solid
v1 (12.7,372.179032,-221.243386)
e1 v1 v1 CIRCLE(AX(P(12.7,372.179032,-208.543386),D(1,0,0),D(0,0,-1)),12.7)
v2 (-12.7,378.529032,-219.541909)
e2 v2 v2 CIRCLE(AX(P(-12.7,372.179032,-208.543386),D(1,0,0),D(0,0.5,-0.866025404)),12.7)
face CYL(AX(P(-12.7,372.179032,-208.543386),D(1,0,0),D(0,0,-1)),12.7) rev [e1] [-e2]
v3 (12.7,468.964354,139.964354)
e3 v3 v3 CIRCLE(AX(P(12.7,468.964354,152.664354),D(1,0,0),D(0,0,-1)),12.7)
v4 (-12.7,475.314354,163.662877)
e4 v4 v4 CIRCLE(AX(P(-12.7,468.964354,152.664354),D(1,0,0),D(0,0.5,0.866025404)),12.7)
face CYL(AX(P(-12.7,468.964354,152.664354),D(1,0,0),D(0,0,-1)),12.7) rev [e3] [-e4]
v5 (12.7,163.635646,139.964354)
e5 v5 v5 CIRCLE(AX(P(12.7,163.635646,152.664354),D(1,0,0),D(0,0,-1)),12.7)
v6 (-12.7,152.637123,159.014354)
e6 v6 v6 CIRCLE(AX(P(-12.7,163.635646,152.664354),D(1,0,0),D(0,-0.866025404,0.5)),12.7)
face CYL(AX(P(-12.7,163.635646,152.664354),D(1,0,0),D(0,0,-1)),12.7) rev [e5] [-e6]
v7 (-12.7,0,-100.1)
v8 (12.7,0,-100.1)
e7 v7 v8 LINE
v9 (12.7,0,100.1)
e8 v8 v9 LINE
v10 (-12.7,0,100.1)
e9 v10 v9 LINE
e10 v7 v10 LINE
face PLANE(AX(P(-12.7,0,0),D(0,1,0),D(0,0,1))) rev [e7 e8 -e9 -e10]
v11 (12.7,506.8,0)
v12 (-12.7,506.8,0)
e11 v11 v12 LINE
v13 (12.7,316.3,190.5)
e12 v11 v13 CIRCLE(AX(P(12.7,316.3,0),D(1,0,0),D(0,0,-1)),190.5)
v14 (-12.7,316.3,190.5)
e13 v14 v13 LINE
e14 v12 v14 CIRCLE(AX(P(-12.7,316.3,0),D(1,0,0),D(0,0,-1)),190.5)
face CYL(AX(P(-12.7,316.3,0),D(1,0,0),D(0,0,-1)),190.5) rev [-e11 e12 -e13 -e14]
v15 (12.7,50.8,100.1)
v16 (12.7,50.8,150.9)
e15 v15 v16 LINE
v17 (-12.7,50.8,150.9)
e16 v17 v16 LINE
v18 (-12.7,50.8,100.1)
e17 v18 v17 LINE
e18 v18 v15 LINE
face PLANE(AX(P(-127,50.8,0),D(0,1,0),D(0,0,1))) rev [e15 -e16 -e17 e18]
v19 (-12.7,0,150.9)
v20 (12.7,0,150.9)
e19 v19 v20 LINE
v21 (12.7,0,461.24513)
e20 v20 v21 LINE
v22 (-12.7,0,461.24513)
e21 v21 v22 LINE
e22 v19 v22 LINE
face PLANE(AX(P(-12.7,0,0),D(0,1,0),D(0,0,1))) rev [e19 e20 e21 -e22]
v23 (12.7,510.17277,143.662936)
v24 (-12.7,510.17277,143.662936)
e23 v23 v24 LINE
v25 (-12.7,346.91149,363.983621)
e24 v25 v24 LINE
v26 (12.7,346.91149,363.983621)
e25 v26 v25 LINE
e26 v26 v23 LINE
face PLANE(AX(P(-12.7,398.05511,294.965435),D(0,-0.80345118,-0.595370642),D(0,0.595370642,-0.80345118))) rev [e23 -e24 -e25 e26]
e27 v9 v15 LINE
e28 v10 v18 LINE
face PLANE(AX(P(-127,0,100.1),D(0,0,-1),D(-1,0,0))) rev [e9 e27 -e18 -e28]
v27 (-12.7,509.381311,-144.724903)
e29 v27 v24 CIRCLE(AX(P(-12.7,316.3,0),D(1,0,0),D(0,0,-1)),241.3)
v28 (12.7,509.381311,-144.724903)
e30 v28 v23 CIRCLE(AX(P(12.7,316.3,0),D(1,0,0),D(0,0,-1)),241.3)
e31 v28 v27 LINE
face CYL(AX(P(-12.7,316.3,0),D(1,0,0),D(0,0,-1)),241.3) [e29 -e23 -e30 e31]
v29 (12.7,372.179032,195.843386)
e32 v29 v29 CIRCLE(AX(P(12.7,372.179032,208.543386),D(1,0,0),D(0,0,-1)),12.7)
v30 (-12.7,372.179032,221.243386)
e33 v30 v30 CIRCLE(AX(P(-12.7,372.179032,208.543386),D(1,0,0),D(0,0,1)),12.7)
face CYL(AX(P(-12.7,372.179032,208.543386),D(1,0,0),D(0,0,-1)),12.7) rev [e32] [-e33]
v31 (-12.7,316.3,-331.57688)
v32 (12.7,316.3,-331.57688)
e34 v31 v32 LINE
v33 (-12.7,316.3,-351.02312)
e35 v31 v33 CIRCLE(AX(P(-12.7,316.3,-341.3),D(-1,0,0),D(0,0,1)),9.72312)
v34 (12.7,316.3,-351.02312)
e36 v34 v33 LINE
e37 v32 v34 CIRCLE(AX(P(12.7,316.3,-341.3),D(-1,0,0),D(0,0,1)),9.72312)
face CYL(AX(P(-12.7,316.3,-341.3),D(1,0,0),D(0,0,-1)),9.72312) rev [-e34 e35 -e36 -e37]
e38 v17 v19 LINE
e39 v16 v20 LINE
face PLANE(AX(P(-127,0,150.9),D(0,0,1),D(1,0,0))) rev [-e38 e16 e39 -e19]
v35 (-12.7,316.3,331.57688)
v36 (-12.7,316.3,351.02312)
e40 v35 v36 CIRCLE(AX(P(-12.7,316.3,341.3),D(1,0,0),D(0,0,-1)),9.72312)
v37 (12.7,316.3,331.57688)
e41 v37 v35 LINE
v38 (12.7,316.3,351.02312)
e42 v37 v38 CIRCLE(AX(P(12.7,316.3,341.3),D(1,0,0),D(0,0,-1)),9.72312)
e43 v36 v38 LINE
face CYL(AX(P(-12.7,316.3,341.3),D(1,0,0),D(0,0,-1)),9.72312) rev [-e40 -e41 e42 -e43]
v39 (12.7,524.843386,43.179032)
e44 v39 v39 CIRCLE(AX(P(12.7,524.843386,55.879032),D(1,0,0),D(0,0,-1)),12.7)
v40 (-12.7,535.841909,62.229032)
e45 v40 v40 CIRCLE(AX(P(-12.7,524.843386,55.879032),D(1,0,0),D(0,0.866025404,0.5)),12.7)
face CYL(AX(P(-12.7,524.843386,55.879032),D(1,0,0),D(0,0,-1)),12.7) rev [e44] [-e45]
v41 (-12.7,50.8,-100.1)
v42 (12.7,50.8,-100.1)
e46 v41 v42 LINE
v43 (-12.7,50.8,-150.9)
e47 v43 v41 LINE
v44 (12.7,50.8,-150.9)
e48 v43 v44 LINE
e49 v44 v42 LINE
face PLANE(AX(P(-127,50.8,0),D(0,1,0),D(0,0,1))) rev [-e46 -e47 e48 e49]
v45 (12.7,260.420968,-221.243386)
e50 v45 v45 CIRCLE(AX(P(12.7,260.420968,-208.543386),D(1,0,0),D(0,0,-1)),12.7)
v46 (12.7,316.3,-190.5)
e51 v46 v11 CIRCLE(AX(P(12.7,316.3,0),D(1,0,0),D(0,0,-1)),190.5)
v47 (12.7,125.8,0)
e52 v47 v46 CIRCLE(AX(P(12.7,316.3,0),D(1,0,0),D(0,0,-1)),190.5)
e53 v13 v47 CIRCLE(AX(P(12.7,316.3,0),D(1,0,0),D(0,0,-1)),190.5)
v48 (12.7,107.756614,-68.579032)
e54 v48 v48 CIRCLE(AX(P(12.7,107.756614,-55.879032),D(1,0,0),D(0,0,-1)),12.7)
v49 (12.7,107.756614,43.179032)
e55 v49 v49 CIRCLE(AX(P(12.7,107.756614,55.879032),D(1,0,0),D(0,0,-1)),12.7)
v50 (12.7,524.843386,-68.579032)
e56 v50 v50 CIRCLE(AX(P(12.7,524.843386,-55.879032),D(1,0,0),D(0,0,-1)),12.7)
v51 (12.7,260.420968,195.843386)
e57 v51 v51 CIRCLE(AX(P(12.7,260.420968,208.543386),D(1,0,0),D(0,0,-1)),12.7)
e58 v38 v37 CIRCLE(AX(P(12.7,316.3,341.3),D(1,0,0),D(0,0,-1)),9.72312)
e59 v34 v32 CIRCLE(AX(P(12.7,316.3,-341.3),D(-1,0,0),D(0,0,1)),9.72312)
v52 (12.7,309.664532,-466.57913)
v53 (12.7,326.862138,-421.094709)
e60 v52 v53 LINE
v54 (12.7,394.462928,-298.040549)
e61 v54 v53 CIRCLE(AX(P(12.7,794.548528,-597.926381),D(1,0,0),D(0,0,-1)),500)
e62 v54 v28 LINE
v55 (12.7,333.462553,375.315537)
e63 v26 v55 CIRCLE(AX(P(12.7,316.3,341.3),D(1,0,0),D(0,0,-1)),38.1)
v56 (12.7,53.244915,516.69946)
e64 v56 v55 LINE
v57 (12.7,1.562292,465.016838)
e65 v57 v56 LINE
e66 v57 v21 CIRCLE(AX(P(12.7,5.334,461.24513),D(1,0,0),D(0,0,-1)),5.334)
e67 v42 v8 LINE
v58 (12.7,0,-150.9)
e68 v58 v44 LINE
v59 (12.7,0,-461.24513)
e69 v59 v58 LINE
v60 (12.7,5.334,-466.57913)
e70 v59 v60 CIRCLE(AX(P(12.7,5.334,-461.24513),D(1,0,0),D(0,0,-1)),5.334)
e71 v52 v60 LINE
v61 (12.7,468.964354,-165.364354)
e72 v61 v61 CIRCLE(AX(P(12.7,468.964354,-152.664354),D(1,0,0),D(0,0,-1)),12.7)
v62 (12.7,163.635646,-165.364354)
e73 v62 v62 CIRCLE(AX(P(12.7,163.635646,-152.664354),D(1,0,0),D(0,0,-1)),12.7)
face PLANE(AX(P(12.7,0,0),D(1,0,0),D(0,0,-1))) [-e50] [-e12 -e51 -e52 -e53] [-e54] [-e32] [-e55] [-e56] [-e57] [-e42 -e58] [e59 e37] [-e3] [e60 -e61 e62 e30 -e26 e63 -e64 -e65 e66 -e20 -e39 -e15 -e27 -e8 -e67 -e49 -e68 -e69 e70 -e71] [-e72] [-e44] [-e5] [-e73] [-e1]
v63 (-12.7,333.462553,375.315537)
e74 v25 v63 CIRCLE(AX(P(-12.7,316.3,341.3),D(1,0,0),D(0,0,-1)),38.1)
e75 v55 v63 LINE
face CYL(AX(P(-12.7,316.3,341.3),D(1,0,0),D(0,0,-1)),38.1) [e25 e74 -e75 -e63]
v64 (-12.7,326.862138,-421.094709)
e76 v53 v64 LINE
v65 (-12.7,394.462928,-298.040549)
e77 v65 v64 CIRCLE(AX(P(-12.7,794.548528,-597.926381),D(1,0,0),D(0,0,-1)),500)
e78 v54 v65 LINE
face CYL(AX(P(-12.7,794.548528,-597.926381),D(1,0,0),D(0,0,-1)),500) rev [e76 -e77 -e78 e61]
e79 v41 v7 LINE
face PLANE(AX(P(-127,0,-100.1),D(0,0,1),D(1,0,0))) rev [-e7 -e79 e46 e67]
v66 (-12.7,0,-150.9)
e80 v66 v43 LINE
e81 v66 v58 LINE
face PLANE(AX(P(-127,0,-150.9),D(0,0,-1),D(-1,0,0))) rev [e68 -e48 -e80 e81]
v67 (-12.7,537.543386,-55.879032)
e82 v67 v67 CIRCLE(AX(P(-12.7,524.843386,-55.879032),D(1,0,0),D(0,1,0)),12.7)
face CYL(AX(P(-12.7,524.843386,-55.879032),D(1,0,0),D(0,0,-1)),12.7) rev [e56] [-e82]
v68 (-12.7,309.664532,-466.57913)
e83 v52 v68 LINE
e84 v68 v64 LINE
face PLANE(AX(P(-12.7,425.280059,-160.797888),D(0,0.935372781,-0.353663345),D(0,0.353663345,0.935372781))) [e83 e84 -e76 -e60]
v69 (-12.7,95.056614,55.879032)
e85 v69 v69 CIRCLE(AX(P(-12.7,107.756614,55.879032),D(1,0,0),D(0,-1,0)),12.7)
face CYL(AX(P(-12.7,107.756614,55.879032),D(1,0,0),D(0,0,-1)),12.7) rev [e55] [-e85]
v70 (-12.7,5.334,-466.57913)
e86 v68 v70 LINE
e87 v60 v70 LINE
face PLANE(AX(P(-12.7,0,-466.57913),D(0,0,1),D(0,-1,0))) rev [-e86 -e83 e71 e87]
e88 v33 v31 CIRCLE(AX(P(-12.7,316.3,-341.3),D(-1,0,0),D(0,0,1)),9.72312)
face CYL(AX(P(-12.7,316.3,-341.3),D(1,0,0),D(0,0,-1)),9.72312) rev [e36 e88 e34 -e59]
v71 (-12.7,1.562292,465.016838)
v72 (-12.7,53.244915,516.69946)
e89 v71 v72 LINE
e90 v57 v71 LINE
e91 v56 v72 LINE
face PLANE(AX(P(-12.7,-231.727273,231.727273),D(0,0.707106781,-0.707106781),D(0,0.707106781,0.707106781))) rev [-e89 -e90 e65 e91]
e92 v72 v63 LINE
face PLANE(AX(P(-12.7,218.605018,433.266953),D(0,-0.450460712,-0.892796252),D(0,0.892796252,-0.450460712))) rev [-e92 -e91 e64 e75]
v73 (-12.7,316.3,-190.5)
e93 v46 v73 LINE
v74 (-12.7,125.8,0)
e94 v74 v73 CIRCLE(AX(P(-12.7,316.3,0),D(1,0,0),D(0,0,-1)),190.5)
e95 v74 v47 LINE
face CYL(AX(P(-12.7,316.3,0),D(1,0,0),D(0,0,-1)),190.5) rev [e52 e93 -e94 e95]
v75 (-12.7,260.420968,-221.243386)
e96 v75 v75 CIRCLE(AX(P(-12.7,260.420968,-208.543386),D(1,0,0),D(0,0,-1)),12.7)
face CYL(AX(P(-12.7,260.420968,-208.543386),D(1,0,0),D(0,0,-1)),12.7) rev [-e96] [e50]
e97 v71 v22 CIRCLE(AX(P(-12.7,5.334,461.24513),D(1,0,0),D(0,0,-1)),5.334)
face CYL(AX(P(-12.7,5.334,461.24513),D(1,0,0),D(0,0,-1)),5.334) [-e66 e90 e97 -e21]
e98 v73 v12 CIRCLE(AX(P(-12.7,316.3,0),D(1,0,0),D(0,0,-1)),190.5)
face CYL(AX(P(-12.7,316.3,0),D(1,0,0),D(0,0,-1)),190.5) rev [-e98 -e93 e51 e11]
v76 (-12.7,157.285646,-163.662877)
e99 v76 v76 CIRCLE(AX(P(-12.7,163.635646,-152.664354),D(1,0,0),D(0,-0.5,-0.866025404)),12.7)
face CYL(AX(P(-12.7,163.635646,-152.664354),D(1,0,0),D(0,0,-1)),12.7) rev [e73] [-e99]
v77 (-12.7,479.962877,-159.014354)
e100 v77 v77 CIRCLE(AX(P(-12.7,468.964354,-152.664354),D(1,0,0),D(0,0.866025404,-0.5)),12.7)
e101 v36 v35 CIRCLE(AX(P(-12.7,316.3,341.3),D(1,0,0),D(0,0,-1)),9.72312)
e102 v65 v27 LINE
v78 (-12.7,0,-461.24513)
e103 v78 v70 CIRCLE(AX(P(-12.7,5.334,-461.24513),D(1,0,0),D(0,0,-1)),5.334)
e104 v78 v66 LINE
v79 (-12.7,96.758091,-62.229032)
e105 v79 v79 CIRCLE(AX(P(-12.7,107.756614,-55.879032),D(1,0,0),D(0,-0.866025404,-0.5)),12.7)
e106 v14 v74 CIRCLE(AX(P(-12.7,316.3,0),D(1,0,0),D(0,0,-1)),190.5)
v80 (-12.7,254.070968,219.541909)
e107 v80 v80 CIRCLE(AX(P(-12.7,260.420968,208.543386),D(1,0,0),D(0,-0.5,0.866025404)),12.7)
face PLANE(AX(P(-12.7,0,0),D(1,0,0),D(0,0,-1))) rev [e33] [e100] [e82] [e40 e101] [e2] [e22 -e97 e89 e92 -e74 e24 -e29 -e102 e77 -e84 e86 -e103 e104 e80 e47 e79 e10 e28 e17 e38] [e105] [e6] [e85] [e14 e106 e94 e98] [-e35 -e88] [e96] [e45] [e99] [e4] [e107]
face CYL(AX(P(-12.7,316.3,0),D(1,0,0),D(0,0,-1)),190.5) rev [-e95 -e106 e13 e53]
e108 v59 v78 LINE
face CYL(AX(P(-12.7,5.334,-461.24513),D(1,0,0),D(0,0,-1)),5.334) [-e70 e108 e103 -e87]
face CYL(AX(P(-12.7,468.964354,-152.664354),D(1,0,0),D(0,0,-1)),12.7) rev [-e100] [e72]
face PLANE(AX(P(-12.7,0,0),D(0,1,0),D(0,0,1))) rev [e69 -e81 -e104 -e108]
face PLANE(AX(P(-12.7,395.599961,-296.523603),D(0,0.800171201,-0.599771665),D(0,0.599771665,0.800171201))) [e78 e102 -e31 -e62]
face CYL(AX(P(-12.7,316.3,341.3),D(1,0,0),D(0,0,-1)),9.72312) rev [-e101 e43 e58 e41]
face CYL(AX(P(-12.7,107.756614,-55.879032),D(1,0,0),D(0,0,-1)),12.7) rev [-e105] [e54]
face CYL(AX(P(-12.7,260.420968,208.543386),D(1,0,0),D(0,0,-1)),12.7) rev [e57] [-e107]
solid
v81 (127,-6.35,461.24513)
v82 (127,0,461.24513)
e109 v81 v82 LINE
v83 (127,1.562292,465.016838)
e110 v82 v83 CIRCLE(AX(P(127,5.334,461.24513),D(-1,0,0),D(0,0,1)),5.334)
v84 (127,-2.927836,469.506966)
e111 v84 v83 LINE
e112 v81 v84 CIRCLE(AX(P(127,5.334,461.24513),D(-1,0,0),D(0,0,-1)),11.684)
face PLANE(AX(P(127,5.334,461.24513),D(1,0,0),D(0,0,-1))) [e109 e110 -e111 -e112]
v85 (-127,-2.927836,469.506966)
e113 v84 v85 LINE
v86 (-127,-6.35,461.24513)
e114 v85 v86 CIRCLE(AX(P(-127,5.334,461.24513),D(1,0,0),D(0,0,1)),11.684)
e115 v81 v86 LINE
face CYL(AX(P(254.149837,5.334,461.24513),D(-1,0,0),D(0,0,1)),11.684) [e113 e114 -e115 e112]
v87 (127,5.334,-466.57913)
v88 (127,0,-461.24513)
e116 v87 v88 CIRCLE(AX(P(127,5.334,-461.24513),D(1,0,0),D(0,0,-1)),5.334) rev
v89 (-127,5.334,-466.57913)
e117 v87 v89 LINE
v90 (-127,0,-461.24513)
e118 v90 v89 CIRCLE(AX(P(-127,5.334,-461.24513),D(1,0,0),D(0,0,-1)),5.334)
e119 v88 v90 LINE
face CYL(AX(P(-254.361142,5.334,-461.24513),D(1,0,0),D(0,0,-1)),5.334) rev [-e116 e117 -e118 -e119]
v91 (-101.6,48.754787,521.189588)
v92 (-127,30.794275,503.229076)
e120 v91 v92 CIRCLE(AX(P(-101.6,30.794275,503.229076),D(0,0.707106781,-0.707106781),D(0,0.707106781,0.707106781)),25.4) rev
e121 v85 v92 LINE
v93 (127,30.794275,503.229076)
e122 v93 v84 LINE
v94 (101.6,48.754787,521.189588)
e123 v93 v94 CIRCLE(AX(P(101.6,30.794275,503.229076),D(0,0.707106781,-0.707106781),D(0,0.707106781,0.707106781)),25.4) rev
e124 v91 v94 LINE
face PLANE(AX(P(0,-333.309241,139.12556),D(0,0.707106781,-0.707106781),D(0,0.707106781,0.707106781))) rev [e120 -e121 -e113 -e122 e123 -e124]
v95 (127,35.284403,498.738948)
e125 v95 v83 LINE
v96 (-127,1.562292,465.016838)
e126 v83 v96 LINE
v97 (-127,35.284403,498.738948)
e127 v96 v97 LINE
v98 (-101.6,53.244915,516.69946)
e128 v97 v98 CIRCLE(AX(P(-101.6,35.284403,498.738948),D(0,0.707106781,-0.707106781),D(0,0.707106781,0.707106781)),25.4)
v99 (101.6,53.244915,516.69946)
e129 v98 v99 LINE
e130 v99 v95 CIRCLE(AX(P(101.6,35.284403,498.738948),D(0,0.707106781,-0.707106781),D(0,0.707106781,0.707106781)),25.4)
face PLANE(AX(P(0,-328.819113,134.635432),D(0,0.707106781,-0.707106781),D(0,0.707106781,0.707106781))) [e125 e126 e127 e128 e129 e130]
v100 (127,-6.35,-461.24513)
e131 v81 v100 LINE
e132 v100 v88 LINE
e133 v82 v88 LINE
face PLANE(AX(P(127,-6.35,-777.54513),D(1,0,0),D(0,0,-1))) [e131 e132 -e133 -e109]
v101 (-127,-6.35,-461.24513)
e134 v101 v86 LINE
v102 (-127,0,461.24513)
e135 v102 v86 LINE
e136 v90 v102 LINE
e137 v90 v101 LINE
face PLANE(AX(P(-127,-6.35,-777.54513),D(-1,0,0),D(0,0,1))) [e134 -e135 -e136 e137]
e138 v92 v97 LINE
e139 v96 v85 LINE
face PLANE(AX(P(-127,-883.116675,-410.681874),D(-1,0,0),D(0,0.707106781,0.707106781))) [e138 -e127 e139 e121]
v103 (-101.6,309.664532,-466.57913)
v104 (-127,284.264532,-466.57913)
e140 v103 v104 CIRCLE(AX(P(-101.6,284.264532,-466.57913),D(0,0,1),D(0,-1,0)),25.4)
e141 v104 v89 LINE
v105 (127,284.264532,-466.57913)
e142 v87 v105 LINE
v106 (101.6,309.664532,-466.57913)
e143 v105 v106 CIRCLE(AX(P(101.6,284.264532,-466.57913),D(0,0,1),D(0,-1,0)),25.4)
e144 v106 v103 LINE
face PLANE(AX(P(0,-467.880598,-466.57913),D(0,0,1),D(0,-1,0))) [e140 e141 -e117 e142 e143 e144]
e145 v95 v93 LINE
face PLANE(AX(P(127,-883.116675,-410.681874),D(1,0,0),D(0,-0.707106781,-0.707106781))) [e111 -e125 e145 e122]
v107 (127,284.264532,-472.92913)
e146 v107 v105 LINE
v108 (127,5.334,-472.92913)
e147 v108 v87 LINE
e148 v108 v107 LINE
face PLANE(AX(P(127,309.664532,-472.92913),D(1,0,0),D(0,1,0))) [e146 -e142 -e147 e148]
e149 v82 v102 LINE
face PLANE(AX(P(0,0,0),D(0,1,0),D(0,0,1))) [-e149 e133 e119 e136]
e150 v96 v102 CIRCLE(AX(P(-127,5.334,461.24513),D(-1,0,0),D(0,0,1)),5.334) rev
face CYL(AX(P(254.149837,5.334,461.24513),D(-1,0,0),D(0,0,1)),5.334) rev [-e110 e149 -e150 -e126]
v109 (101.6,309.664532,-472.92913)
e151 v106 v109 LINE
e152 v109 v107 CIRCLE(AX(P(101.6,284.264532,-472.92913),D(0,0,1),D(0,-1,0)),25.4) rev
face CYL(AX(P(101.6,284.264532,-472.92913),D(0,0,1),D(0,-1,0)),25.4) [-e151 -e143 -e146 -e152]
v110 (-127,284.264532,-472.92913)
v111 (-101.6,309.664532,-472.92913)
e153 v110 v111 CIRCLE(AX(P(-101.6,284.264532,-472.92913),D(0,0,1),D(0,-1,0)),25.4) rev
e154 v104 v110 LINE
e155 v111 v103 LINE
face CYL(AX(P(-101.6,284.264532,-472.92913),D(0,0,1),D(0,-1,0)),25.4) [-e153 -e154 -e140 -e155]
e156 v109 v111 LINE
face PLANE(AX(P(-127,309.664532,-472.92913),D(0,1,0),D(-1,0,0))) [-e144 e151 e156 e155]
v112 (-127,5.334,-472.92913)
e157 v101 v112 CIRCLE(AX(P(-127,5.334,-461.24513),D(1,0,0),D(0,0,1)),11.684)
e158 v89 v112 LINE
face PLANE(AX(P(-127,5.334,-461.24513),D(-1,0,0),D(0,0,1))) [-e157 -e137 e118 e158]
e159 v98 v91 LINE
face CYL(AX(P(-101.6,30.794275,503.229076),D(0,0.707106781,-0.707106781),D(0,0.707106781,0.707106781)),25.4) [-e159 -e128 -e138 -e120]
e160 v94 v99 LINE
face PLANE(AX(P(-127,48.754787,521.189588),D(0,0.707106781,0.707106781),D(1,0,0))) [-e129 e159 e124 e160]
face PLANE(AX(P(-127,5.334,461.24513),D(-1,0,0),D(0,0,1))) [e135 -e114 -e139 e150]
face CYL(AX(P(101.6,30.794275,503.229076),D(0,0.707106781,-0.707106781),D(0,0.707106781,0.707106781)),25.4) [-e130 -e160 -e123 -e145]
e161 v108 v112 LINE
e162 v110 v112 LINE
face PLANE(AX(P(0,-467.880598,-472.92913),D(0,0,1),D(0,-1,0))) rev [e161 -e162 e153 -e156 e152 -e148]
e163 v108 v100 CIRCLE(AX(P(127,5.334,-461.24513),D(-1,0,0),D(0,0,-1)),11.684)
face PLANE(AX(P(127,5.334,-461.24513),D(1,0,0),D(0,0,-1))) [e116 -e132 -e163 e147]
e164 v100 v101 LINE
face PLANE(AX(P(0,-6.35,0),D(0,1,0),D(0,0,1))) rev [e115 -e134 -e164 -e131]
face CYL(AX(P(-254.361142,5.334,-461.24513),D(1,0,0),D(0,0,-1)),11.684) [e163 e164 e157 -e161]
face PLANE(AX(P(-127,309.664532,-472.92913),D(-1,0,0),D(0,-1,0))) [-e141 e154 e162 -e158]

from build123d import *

# Parameters (mm, degrees)
FLANGE_PROFILE_DEPTH                = 12.7
F_7_8_1_DIAMETER_HOLE1_D            = 25.4
BOLT_PATTERN_COUNT                  = 12
SKETCH15_R                          = 9.72312
BOSS_EXTRUDE1_DEPTH                 = 12.7
SKETCH5_W                           = 254
SKETCH5_H                           = 1317.865260112
BASE_SKID_DEPTH                     = 6.35
BEND_START                          = -127
BEND_HEEL_DEPTH                     = 254
BEND_HEEL_2_DEPTH                   = 254
BEND_TOE_DEPTH                      = 254
BEND_TOE_2_DEPTH                    = 254
WEBBING_BODY_DEPTH                  = 12.7
WEBBING_EXTRUDE_DEPTH               = 12.7
SKID_START                          = -472.929130056
SKID_EDGES_DEPTH                    = 6.35
SKID_START_2                        = -334.061851681
SKID_EDGES_2_DEPTH                  = 6.35
FILLET1_R                           = 500
CONVERT_START                       = -12.7
CONVERT_FLANGE_TO_SHEET_OUTLINE_R   = 12.7
CONVERT_FLANGE_TO_SHEET_OUTLINE_R_2 = 9.72312
CONVERT_FLANGE_TO_SHEET_OUTLINE_R_3 = 190.5
CONVERT_FLANGE_TO_SHEET_DEPTH       = 25.4
CUT_EXTRUDE1_DEPTH                  = 774.747599071
CUT_EXTRUDE1_DEPTH_BACK             = 774.747599071
WEBBING_4_W                         = 50.8
WEBBING_4_H                         = 50.8


# Read off the part's stored shape, not the designer's step: Bend Heel, Bend Toe, Skid Edges, Convert Flange to Sheet
# Sheet-metal steps are written as plain solids
with BuildPart() as part:
    # Sketch1 → Flange Profile (new, symmetric)
    with BuildSketch(Plane(origin=(0, 0, 0), x_dir=(0, 0, -1), z_dir=(1, 0, 0))):
        with BuildLine():
            ThreePointArc((-190.5, 316.3), (0, 506.8), (190.5, 316.3))
            Line((190.5, 316.3), (241.3, 316.3))
            ThreePointArc((241.3, 316.3), (0, 557.6), (-241.3, 316.3))
            Line((-241.3, 316.3), (-190.5, 316.3))
        make_face()
        with BuildLine():
            Line((241.3, 316.3), (190.5, 316.3))
            ThreePointArc((190.5, 316.3), (0, 125.8), (-190.5, 316.3))
            Line((-190.5, 316.3), (-241.3, 316.3))
            ThreePointArc((-241.3, 316.3), (0, 75), (241.3, 316.3))
        make_face()
    extrude(amount=FLANGE_PROFILE_DEPTH, both=True)

    # 7/8 (1) Diameter Hole1 (through all)
    with Locations(Plane(origin=(12.7, 260.420968162, -208.543385896), x_dir=(0, 0, 1), z_dir=(1, 0, 0))):
        with Locations((0, 0)):
            f_7_8_1_diameter_hole1 = Hole(F_7_8_1_DIAMETER_HOLE1_D / 2)

    # Bolt Pattern: 7/8 (1) Diameter Hole1 ×12 about axis
    bolt_pattern_axis = Axis((0, 316.3, 0), (1, 0, 0))
    for i in range(1, BOLT_PATTERN_COUNT):
        add(f_7_8_1_diameter_hole1.rotate(bolt_pattern_axis, i * 360 / BOLT_PATTERN_COUNT), mode=Mode.SUBTRACT)

    # Sketch15 → Boss-Extrude1 (add, symmetric)
    with BuildSketch(Plane(origin=(0, 0, 0), x_dir=(0, 0, -1), z_dir=(1, 0, 0))):
        with BuildLine():
            Line((-238.273120599, 278.2), (-341.3, 278.2))
            ThreePointArc((-341.3, 278.2), (-379.4, 316.3), (-341.3, 354.4))
            Line((-341.3, 354.4), (-238.273120599, 354.4))
            ThreePointArc((-238.273120599, 354.4), (-200.173120599, 316.3), (-238.273120599, 278.2))
        make_face()
        with Locations((-341.3, 316.3)):
            Circle(SKETCH15_R, mode=Mode.SUBTRACT)
    boss_extrude1 = extrude(amount=BOSS_EXTRUDE1_DEPTH, both=True)

    # Mirror2: Boss-Extrude1 across plane
    add(boss_extrude1.mirror(Plane.XY))

    # Web Outline → Webbing Body (add, symmetric)
    with BuildSketch(Plane(origin=(0, 0, 0), x_dir=(0, 0, -1), z_dir=(1, 0, 0))):
        with BuildLine():
            Line((-516.69946035, 53.244915153), (-465.016837626, 1.562292429))
            ThreePointArc((-465.016837626, 1.562292429), (-463.286363484, 0.406026574), (-461.245130056, 0))
            Line((-461.245130056, 0), (461.245130056, 0))
            ThreePointArc((461.245130056, 0), (465.016837626, 1.562292429), (466.579130056, 5.334))
            Line((466.579130056, 5.334), (466.579130056, 309.66453199))
            Line((466.579130056, 309.66453199), (354.774573435, 351.937702939))
            ThreePointArc((354.774573435, 351.937702939), (378.779370872, 309.451149073), (341.3, 278.2))
            Line((341.3, 278.2), (238.273120599, 278.2))
            ThreePointArc((238.273120599, 278.2), (0, 75), (-238.273120599, 278.2))
            Line((-238.273120599, 278.2), (-341.3, 278.2))
            ThreePointArc((-341.3, 278.2), (-373.746134391, 296.328561317), (-375.315537192, 333.462553119))
            Line((-375.315537192, 333.462553119), (-516.69946035, 53.244915153))
        make_face()
    extrude(amount=WEBBING_BODY_DEPTH, both=True)

    # webbing → Webbing Extrude (add, symmetric)
    with BuildSketch(Plane(origin=(0, 0, 0), x_dir=(0, 0, -1), z_dir=(1, 0, 0))):
        with BuildLine():
            Line((-341.3, 354.4), (-238.273120599, 354.4))
            ThreePointArc((-238.273120599, 354.4), (-206.240337357, 441.562178038), (-143.662935834, 510.172769794))
            Line((-143.662935834, 510.172769794), (-363.983621447, 346.911489968))
            ThreePointArc((-363.983621447, 346.911489968), (-353.243873581, 352.479467711), (-341.3, 354.4))
        make_face()
        with BuildLine():
            ThreePointArc((144.724902657, 509.381310724), (206.583332152, 440.995697107), (238.273120599, 354.4))
            Line((238.273120599, 354.4), (341.3, 354.4))
            ThreePointArc((341.3, 354.4), (348.148850927, 353.779370872), (354.774573435, 351.937702939))
            Line((354.774573435, 351.937702939), (144.724902657, 509.381310724))
        make_face()
    extrude(amount=WEBBING_EXTRUDE_DEPTH, both=True)

    # Fillet1
    fillet1_edges = [part.edges().sort_by_distance(p)[0] for p in [
        (0, 351.937702939, -354.774573435),
    ]]
    fillet(fillet1_edges, radius=FILLET1_R)


with BuildPart() as body_2:
    # Sketch5 → Base Skid (new body)
    with BuildSketch(Plane(origin=(0, 0, 0), x_dir=(1, 0, 0), z_dir=(0, 1, 0))):
        with Locations((0, 118.6125)):
            Rectangle(SKETCH5_W, SKETCH5_H)
    extrude(amount=-BASE_SKID_DEPTH)

    # Bend Heel outline → Bend Heel (cut)
    with BuildSketch(Plane.YZ.offset(BEND_START)):
        with BuildLine():
            Line((0, -777.545130056), (0, -471.640528076))
            ThreePointArc((0, -471.640528076), (-4.636915504, -467.33583609), (-6.35, -461.245130056))
            Line((-6.35, -461.245130056), (-6.35, -777.545130056))
            Line((-6.35, -777.545130056), (0, -777.545130056))
        make_face()
    extrude(amount=BEND_HEEL_DEPTH, mode=Mode.SUBTRACT)

    # Bend Heel 2 outline → Bend Heel 2 (add)
    with BuildSketch(Plane.YZ.offset(BEND_START)):
        with BuildLine():
            Line((5.334, -472.929130056), (309.66453199, -472.929130056))
            Line((309.66453199, -472.929130056), (309.66453199, -466.579130056))
            Line((309.66453199, -466.579130056), (5.334, -466.579130056))
            ThreePointArc((5.334, -466.579130056), (1.56229243, -465.016837626), (0, -461.245130056))
            Line((0, -461.245130056), (0, -471.640528076))
            ThreePointArc((0, -471.640528076), (2.590277571, -472.602411563), (5.334, -472.929130056))
        make_face()
    extrude(amount=BEND_HEEL_2_DEPTH)

    # Bend Toe outline → Bend Toe (cut)
    with BuildSketch(Plane.YZ.offset(BEND_START)):
        with BuildLine():
            Line((-6.35, 540.320130056), (-6.35, 461.245130056))
            ThreePointArc((-6.35, 461.245130056), (-5.460608458, 465.71640328), (-2.927835631, 469.506965687))
            Line((-2.927835631, 469.506965687), (0, 472.434801318))
            Line((0, 472.434801318), (0, 540.320130056))
            Line((0, 540.320130056), (-6.35, 540.320130056))
        make_face()
    extrude(amount=BEND_TOE_DEPTH, mode=Mode.SUBTRACT)

    # Bend Toe 2 outline → Bend Toe 2 (add)
    with BuildSketch(Plane.YZ.offset(BEND_START)):
        with BuildLine():
            Line((48.754787092, 521.189588411), (0, 472.434801318))
            Line((0, 472.434801318), (0, 461.245130056))
            ThreePointArc((0, 461.245130056), (0.406026574, 463.286363484), (1.562292429, 465.016837626))
            Line((1.562292429, 465.016837626), (53.244915153, 516.69946035))
            Line((53.244915153, 516.69946035), (48.754787092, 521.189588411))
        make_face()
    extrude(amount=BEND_TOE_2_DEPTH)

    # Skid Edges outline → Skid Edges (cut)
    with BuildSketch(Plane.XY.offset(SKID_START)):
        with BuildLine():
            ThreePointArc((-127, 284.26453199), (-119.560512242, 302.225044232), (-101.6, 309.66453199))
            Line((-101.6, 309.66453199), (-127, 309.66453199))
            Line((-127, 309.66453199), (-127, 284.26453199))
        make_face()
        with BuildLine():
            ThreePointArc((101.6, 309.66453199), (119.560512242, 302.225044232), (127, 284.26453199))
            Line((127, 284.26453199), (127, 309.66453199))
            Line((127, 309.66453199), (101.6, 309.66453199))
        make_face()
    extrude(amount=SKID_EDGES_DEPTH, mode=Mode.SUBTRACT)

    # Skid Edges 2 outline → Skid Edges 2 (cut)
    with BuildSketch(Plane(origin=(0, 0, 0), x_dir=(1, 0, 0), z_dir=(0, 0.707106781186546, -0.707106781186549)).offset(SKID_START_2)):
        with BuildLine():
            Line((-127, -403.011532817), (-101.6, -403.011532817))
            ThreePointArc((-101.6, -403.011532817), (-119.560512242, -395.572045059), (-127, -377.611532817))
            Line((-127, -377.611532817), (-127, -403.011532817))
        make_face()
        with BuildLine():
            ThreePointArc((127, -377.611532817), (119.560512242, -395.572045059), (101.6, -403.011532817))
            Line((101.6, -403.011532817), (127, -403.011532817))
            Line((127, -403.011532817), (127, -377.611532817))
        make_face()
    extrude(amount=SKID_EDGES_2_DEPTH, mode=Mode.SUBTRACT)


with BuildPart() as body_3:
    # Convert Flange to Sheet outline → Convert Flange to Sheet (new body)
    with BuildSketch(Plane.YZ.offset(CONVERT_START)):
        with BuildLine():
            ThreePointArc((509.381310724, -144.724902657), (557.599091285, -0.66222749), (510.172769794, 143.662935834))
            Line((510.172769794, 143.662935834), (346.911489968, 363.983621447))
            ThreePointArc((346.911489968, 363.983621447), (340.849804008, 370.436182371), (333.462553119, 375.315537192))
            Line((333.462553119, 375.315537192), (53.244915153, 516.69946035))
            Line((53.244915153, 516.69946035), (1.562292429, 465.016837626))
            ThreePointArc((1.562292429, 465.016837626), (0.406026574, 463.286363484), (0, 461.245130056))
            Line((0, 461.245130056), (0, -461.245130056))
            ThreePointArc((0, -461.245130056), (1.56229243, -465.016837626), (5.334, -466.579130056))
            Line((5.334, -466.579130056), (309.66453199, -466.579130056))
            Line((309.66453199, -466.579130056), (326.862138017, -421.094708764))
            ThreePointArc((326.862138017, -421.094708764), (356.321830687, -357.183029185), (394.462927947, -298.040548863))
            Line((394.462927947, -298.040548863), (509.381310724, -144.724902657))
        make_face()
        with Locations((107.756614104, -55.879031838)):
            Circle(CONVERT_FLANGE_TO_SHEET_OUTLINE_R, mode=Mode.SUBTRACT)
        with Locations((163.635645942, -152.664354058)):
            Circle(CONVERT_FLANGE_TO_SHEET_OUTLINE_R, mode=Mode.SUBTRACT)
        with Locations((260.420968162, -208.543385896)):
            Circle(CONVERT_FLANGE_TO_SHEET_OUTLINE_R, mode=Mode.SUBTRACT)
        with Locations((316.3, -341.3)):
            Circle(CONVERT_FLANGE_TO_SHEET_OUTLINE_R_2, mode=Mode.SUBTRACT)
        with Locations((372.179031838, -208.543385896)):
            Circle(CONVERT_FLANGE_TO_SHEET_OUTLINE_R, mode=Mode.SUBTRACT)
        with Locations((316.3, 0)):
            Circle(CONVERT_FLANGE_TO_SHEET_OUTLINE_R_3, mode=Mode.SUBTRACT)
        with Locations((468.964354058, -152.664354058)):
            Circle(CONVERT_FLANGE_TO_SHEET_OUTLINE_R, mode=Mode.SUBTRACT)
        with Locations((524.843385896, -55.879031838)):
            Circle(CONVERT_FLANGE_TO_SHEET_OUTLINE_R, mode=Mode.SUBTRACT)
        with Locations((107.756614104, 55.879031838)):
            Circle(CONVERT_FLANGE_TO_SHEET_OUTLINE_R, mode=Mode.SUBTRACT)
        with Locations((163.635645942, 152.664354058)):
            Circle(CONVERT_FLANGE_TO_SHEET_OUTLINE_R, mode=Mode.SUBTRACT)
        with Locations((260.420968162, 208.543385896)):
            Circle(CONVERT_FLANGE_TO_SHEET_OUTLINE_R, mode=Mode.SUBTRACT)
        with Locations((372.179031838, 208.543385896)):
            Circle(CONVERT_FLANGE_TO_SHEET_OUTLINE_R, mode=Mode.SUBTRACT)
        with Locations((524.843385896, 55.879031838)):
            Circle(CONVERT_FLANGE_TO_SHEET_OUTLINE_R, mode=Mode.SUBTRACT)
        with Locations((468.964354058, 152.664354058)):
            Circle(CONVERT_FLANGE_TO_SHEET_OUTLINE_R, mode=Mode.SUBTRACT)
        with Locations((316.3, 341.3)):
            Circle(CONVERT_FLANGE_TO_SHEET_OUTLINE_R_2, mode=Mode.SUBTRACT)
    extrude(amount=CONVERT_FLANGE_TO_SHEET_DEPTH)

    # webbing<4> → Cut-Extrude1 (cut, two sides: drawn at the far end of the back side and taken through both)
    with BuildSketch(Plane(origin=(0, 0, 0), x_dir=(0, 0, -1), z_dir=(1, 0, 0)).offset(-CUT_EXTRUDE1_DEPTH_BACK)):
        with Locations((125.5, 25.4)):
            Rectangle(WEBBING_4_W, WEBBING_4_H)
        with Locations((-125.5, 25.4)):
            Rectangle(WEBBING_4_W, WEBBING_4_H)
    extrude(amount=CUT_EXTRUDE1_DEPTH + CUT_EXTRUDE1_DEPTH_BACK, mode=Mode.SUBTRACT)


solid = Compound([body_2.part, body_3.part])
